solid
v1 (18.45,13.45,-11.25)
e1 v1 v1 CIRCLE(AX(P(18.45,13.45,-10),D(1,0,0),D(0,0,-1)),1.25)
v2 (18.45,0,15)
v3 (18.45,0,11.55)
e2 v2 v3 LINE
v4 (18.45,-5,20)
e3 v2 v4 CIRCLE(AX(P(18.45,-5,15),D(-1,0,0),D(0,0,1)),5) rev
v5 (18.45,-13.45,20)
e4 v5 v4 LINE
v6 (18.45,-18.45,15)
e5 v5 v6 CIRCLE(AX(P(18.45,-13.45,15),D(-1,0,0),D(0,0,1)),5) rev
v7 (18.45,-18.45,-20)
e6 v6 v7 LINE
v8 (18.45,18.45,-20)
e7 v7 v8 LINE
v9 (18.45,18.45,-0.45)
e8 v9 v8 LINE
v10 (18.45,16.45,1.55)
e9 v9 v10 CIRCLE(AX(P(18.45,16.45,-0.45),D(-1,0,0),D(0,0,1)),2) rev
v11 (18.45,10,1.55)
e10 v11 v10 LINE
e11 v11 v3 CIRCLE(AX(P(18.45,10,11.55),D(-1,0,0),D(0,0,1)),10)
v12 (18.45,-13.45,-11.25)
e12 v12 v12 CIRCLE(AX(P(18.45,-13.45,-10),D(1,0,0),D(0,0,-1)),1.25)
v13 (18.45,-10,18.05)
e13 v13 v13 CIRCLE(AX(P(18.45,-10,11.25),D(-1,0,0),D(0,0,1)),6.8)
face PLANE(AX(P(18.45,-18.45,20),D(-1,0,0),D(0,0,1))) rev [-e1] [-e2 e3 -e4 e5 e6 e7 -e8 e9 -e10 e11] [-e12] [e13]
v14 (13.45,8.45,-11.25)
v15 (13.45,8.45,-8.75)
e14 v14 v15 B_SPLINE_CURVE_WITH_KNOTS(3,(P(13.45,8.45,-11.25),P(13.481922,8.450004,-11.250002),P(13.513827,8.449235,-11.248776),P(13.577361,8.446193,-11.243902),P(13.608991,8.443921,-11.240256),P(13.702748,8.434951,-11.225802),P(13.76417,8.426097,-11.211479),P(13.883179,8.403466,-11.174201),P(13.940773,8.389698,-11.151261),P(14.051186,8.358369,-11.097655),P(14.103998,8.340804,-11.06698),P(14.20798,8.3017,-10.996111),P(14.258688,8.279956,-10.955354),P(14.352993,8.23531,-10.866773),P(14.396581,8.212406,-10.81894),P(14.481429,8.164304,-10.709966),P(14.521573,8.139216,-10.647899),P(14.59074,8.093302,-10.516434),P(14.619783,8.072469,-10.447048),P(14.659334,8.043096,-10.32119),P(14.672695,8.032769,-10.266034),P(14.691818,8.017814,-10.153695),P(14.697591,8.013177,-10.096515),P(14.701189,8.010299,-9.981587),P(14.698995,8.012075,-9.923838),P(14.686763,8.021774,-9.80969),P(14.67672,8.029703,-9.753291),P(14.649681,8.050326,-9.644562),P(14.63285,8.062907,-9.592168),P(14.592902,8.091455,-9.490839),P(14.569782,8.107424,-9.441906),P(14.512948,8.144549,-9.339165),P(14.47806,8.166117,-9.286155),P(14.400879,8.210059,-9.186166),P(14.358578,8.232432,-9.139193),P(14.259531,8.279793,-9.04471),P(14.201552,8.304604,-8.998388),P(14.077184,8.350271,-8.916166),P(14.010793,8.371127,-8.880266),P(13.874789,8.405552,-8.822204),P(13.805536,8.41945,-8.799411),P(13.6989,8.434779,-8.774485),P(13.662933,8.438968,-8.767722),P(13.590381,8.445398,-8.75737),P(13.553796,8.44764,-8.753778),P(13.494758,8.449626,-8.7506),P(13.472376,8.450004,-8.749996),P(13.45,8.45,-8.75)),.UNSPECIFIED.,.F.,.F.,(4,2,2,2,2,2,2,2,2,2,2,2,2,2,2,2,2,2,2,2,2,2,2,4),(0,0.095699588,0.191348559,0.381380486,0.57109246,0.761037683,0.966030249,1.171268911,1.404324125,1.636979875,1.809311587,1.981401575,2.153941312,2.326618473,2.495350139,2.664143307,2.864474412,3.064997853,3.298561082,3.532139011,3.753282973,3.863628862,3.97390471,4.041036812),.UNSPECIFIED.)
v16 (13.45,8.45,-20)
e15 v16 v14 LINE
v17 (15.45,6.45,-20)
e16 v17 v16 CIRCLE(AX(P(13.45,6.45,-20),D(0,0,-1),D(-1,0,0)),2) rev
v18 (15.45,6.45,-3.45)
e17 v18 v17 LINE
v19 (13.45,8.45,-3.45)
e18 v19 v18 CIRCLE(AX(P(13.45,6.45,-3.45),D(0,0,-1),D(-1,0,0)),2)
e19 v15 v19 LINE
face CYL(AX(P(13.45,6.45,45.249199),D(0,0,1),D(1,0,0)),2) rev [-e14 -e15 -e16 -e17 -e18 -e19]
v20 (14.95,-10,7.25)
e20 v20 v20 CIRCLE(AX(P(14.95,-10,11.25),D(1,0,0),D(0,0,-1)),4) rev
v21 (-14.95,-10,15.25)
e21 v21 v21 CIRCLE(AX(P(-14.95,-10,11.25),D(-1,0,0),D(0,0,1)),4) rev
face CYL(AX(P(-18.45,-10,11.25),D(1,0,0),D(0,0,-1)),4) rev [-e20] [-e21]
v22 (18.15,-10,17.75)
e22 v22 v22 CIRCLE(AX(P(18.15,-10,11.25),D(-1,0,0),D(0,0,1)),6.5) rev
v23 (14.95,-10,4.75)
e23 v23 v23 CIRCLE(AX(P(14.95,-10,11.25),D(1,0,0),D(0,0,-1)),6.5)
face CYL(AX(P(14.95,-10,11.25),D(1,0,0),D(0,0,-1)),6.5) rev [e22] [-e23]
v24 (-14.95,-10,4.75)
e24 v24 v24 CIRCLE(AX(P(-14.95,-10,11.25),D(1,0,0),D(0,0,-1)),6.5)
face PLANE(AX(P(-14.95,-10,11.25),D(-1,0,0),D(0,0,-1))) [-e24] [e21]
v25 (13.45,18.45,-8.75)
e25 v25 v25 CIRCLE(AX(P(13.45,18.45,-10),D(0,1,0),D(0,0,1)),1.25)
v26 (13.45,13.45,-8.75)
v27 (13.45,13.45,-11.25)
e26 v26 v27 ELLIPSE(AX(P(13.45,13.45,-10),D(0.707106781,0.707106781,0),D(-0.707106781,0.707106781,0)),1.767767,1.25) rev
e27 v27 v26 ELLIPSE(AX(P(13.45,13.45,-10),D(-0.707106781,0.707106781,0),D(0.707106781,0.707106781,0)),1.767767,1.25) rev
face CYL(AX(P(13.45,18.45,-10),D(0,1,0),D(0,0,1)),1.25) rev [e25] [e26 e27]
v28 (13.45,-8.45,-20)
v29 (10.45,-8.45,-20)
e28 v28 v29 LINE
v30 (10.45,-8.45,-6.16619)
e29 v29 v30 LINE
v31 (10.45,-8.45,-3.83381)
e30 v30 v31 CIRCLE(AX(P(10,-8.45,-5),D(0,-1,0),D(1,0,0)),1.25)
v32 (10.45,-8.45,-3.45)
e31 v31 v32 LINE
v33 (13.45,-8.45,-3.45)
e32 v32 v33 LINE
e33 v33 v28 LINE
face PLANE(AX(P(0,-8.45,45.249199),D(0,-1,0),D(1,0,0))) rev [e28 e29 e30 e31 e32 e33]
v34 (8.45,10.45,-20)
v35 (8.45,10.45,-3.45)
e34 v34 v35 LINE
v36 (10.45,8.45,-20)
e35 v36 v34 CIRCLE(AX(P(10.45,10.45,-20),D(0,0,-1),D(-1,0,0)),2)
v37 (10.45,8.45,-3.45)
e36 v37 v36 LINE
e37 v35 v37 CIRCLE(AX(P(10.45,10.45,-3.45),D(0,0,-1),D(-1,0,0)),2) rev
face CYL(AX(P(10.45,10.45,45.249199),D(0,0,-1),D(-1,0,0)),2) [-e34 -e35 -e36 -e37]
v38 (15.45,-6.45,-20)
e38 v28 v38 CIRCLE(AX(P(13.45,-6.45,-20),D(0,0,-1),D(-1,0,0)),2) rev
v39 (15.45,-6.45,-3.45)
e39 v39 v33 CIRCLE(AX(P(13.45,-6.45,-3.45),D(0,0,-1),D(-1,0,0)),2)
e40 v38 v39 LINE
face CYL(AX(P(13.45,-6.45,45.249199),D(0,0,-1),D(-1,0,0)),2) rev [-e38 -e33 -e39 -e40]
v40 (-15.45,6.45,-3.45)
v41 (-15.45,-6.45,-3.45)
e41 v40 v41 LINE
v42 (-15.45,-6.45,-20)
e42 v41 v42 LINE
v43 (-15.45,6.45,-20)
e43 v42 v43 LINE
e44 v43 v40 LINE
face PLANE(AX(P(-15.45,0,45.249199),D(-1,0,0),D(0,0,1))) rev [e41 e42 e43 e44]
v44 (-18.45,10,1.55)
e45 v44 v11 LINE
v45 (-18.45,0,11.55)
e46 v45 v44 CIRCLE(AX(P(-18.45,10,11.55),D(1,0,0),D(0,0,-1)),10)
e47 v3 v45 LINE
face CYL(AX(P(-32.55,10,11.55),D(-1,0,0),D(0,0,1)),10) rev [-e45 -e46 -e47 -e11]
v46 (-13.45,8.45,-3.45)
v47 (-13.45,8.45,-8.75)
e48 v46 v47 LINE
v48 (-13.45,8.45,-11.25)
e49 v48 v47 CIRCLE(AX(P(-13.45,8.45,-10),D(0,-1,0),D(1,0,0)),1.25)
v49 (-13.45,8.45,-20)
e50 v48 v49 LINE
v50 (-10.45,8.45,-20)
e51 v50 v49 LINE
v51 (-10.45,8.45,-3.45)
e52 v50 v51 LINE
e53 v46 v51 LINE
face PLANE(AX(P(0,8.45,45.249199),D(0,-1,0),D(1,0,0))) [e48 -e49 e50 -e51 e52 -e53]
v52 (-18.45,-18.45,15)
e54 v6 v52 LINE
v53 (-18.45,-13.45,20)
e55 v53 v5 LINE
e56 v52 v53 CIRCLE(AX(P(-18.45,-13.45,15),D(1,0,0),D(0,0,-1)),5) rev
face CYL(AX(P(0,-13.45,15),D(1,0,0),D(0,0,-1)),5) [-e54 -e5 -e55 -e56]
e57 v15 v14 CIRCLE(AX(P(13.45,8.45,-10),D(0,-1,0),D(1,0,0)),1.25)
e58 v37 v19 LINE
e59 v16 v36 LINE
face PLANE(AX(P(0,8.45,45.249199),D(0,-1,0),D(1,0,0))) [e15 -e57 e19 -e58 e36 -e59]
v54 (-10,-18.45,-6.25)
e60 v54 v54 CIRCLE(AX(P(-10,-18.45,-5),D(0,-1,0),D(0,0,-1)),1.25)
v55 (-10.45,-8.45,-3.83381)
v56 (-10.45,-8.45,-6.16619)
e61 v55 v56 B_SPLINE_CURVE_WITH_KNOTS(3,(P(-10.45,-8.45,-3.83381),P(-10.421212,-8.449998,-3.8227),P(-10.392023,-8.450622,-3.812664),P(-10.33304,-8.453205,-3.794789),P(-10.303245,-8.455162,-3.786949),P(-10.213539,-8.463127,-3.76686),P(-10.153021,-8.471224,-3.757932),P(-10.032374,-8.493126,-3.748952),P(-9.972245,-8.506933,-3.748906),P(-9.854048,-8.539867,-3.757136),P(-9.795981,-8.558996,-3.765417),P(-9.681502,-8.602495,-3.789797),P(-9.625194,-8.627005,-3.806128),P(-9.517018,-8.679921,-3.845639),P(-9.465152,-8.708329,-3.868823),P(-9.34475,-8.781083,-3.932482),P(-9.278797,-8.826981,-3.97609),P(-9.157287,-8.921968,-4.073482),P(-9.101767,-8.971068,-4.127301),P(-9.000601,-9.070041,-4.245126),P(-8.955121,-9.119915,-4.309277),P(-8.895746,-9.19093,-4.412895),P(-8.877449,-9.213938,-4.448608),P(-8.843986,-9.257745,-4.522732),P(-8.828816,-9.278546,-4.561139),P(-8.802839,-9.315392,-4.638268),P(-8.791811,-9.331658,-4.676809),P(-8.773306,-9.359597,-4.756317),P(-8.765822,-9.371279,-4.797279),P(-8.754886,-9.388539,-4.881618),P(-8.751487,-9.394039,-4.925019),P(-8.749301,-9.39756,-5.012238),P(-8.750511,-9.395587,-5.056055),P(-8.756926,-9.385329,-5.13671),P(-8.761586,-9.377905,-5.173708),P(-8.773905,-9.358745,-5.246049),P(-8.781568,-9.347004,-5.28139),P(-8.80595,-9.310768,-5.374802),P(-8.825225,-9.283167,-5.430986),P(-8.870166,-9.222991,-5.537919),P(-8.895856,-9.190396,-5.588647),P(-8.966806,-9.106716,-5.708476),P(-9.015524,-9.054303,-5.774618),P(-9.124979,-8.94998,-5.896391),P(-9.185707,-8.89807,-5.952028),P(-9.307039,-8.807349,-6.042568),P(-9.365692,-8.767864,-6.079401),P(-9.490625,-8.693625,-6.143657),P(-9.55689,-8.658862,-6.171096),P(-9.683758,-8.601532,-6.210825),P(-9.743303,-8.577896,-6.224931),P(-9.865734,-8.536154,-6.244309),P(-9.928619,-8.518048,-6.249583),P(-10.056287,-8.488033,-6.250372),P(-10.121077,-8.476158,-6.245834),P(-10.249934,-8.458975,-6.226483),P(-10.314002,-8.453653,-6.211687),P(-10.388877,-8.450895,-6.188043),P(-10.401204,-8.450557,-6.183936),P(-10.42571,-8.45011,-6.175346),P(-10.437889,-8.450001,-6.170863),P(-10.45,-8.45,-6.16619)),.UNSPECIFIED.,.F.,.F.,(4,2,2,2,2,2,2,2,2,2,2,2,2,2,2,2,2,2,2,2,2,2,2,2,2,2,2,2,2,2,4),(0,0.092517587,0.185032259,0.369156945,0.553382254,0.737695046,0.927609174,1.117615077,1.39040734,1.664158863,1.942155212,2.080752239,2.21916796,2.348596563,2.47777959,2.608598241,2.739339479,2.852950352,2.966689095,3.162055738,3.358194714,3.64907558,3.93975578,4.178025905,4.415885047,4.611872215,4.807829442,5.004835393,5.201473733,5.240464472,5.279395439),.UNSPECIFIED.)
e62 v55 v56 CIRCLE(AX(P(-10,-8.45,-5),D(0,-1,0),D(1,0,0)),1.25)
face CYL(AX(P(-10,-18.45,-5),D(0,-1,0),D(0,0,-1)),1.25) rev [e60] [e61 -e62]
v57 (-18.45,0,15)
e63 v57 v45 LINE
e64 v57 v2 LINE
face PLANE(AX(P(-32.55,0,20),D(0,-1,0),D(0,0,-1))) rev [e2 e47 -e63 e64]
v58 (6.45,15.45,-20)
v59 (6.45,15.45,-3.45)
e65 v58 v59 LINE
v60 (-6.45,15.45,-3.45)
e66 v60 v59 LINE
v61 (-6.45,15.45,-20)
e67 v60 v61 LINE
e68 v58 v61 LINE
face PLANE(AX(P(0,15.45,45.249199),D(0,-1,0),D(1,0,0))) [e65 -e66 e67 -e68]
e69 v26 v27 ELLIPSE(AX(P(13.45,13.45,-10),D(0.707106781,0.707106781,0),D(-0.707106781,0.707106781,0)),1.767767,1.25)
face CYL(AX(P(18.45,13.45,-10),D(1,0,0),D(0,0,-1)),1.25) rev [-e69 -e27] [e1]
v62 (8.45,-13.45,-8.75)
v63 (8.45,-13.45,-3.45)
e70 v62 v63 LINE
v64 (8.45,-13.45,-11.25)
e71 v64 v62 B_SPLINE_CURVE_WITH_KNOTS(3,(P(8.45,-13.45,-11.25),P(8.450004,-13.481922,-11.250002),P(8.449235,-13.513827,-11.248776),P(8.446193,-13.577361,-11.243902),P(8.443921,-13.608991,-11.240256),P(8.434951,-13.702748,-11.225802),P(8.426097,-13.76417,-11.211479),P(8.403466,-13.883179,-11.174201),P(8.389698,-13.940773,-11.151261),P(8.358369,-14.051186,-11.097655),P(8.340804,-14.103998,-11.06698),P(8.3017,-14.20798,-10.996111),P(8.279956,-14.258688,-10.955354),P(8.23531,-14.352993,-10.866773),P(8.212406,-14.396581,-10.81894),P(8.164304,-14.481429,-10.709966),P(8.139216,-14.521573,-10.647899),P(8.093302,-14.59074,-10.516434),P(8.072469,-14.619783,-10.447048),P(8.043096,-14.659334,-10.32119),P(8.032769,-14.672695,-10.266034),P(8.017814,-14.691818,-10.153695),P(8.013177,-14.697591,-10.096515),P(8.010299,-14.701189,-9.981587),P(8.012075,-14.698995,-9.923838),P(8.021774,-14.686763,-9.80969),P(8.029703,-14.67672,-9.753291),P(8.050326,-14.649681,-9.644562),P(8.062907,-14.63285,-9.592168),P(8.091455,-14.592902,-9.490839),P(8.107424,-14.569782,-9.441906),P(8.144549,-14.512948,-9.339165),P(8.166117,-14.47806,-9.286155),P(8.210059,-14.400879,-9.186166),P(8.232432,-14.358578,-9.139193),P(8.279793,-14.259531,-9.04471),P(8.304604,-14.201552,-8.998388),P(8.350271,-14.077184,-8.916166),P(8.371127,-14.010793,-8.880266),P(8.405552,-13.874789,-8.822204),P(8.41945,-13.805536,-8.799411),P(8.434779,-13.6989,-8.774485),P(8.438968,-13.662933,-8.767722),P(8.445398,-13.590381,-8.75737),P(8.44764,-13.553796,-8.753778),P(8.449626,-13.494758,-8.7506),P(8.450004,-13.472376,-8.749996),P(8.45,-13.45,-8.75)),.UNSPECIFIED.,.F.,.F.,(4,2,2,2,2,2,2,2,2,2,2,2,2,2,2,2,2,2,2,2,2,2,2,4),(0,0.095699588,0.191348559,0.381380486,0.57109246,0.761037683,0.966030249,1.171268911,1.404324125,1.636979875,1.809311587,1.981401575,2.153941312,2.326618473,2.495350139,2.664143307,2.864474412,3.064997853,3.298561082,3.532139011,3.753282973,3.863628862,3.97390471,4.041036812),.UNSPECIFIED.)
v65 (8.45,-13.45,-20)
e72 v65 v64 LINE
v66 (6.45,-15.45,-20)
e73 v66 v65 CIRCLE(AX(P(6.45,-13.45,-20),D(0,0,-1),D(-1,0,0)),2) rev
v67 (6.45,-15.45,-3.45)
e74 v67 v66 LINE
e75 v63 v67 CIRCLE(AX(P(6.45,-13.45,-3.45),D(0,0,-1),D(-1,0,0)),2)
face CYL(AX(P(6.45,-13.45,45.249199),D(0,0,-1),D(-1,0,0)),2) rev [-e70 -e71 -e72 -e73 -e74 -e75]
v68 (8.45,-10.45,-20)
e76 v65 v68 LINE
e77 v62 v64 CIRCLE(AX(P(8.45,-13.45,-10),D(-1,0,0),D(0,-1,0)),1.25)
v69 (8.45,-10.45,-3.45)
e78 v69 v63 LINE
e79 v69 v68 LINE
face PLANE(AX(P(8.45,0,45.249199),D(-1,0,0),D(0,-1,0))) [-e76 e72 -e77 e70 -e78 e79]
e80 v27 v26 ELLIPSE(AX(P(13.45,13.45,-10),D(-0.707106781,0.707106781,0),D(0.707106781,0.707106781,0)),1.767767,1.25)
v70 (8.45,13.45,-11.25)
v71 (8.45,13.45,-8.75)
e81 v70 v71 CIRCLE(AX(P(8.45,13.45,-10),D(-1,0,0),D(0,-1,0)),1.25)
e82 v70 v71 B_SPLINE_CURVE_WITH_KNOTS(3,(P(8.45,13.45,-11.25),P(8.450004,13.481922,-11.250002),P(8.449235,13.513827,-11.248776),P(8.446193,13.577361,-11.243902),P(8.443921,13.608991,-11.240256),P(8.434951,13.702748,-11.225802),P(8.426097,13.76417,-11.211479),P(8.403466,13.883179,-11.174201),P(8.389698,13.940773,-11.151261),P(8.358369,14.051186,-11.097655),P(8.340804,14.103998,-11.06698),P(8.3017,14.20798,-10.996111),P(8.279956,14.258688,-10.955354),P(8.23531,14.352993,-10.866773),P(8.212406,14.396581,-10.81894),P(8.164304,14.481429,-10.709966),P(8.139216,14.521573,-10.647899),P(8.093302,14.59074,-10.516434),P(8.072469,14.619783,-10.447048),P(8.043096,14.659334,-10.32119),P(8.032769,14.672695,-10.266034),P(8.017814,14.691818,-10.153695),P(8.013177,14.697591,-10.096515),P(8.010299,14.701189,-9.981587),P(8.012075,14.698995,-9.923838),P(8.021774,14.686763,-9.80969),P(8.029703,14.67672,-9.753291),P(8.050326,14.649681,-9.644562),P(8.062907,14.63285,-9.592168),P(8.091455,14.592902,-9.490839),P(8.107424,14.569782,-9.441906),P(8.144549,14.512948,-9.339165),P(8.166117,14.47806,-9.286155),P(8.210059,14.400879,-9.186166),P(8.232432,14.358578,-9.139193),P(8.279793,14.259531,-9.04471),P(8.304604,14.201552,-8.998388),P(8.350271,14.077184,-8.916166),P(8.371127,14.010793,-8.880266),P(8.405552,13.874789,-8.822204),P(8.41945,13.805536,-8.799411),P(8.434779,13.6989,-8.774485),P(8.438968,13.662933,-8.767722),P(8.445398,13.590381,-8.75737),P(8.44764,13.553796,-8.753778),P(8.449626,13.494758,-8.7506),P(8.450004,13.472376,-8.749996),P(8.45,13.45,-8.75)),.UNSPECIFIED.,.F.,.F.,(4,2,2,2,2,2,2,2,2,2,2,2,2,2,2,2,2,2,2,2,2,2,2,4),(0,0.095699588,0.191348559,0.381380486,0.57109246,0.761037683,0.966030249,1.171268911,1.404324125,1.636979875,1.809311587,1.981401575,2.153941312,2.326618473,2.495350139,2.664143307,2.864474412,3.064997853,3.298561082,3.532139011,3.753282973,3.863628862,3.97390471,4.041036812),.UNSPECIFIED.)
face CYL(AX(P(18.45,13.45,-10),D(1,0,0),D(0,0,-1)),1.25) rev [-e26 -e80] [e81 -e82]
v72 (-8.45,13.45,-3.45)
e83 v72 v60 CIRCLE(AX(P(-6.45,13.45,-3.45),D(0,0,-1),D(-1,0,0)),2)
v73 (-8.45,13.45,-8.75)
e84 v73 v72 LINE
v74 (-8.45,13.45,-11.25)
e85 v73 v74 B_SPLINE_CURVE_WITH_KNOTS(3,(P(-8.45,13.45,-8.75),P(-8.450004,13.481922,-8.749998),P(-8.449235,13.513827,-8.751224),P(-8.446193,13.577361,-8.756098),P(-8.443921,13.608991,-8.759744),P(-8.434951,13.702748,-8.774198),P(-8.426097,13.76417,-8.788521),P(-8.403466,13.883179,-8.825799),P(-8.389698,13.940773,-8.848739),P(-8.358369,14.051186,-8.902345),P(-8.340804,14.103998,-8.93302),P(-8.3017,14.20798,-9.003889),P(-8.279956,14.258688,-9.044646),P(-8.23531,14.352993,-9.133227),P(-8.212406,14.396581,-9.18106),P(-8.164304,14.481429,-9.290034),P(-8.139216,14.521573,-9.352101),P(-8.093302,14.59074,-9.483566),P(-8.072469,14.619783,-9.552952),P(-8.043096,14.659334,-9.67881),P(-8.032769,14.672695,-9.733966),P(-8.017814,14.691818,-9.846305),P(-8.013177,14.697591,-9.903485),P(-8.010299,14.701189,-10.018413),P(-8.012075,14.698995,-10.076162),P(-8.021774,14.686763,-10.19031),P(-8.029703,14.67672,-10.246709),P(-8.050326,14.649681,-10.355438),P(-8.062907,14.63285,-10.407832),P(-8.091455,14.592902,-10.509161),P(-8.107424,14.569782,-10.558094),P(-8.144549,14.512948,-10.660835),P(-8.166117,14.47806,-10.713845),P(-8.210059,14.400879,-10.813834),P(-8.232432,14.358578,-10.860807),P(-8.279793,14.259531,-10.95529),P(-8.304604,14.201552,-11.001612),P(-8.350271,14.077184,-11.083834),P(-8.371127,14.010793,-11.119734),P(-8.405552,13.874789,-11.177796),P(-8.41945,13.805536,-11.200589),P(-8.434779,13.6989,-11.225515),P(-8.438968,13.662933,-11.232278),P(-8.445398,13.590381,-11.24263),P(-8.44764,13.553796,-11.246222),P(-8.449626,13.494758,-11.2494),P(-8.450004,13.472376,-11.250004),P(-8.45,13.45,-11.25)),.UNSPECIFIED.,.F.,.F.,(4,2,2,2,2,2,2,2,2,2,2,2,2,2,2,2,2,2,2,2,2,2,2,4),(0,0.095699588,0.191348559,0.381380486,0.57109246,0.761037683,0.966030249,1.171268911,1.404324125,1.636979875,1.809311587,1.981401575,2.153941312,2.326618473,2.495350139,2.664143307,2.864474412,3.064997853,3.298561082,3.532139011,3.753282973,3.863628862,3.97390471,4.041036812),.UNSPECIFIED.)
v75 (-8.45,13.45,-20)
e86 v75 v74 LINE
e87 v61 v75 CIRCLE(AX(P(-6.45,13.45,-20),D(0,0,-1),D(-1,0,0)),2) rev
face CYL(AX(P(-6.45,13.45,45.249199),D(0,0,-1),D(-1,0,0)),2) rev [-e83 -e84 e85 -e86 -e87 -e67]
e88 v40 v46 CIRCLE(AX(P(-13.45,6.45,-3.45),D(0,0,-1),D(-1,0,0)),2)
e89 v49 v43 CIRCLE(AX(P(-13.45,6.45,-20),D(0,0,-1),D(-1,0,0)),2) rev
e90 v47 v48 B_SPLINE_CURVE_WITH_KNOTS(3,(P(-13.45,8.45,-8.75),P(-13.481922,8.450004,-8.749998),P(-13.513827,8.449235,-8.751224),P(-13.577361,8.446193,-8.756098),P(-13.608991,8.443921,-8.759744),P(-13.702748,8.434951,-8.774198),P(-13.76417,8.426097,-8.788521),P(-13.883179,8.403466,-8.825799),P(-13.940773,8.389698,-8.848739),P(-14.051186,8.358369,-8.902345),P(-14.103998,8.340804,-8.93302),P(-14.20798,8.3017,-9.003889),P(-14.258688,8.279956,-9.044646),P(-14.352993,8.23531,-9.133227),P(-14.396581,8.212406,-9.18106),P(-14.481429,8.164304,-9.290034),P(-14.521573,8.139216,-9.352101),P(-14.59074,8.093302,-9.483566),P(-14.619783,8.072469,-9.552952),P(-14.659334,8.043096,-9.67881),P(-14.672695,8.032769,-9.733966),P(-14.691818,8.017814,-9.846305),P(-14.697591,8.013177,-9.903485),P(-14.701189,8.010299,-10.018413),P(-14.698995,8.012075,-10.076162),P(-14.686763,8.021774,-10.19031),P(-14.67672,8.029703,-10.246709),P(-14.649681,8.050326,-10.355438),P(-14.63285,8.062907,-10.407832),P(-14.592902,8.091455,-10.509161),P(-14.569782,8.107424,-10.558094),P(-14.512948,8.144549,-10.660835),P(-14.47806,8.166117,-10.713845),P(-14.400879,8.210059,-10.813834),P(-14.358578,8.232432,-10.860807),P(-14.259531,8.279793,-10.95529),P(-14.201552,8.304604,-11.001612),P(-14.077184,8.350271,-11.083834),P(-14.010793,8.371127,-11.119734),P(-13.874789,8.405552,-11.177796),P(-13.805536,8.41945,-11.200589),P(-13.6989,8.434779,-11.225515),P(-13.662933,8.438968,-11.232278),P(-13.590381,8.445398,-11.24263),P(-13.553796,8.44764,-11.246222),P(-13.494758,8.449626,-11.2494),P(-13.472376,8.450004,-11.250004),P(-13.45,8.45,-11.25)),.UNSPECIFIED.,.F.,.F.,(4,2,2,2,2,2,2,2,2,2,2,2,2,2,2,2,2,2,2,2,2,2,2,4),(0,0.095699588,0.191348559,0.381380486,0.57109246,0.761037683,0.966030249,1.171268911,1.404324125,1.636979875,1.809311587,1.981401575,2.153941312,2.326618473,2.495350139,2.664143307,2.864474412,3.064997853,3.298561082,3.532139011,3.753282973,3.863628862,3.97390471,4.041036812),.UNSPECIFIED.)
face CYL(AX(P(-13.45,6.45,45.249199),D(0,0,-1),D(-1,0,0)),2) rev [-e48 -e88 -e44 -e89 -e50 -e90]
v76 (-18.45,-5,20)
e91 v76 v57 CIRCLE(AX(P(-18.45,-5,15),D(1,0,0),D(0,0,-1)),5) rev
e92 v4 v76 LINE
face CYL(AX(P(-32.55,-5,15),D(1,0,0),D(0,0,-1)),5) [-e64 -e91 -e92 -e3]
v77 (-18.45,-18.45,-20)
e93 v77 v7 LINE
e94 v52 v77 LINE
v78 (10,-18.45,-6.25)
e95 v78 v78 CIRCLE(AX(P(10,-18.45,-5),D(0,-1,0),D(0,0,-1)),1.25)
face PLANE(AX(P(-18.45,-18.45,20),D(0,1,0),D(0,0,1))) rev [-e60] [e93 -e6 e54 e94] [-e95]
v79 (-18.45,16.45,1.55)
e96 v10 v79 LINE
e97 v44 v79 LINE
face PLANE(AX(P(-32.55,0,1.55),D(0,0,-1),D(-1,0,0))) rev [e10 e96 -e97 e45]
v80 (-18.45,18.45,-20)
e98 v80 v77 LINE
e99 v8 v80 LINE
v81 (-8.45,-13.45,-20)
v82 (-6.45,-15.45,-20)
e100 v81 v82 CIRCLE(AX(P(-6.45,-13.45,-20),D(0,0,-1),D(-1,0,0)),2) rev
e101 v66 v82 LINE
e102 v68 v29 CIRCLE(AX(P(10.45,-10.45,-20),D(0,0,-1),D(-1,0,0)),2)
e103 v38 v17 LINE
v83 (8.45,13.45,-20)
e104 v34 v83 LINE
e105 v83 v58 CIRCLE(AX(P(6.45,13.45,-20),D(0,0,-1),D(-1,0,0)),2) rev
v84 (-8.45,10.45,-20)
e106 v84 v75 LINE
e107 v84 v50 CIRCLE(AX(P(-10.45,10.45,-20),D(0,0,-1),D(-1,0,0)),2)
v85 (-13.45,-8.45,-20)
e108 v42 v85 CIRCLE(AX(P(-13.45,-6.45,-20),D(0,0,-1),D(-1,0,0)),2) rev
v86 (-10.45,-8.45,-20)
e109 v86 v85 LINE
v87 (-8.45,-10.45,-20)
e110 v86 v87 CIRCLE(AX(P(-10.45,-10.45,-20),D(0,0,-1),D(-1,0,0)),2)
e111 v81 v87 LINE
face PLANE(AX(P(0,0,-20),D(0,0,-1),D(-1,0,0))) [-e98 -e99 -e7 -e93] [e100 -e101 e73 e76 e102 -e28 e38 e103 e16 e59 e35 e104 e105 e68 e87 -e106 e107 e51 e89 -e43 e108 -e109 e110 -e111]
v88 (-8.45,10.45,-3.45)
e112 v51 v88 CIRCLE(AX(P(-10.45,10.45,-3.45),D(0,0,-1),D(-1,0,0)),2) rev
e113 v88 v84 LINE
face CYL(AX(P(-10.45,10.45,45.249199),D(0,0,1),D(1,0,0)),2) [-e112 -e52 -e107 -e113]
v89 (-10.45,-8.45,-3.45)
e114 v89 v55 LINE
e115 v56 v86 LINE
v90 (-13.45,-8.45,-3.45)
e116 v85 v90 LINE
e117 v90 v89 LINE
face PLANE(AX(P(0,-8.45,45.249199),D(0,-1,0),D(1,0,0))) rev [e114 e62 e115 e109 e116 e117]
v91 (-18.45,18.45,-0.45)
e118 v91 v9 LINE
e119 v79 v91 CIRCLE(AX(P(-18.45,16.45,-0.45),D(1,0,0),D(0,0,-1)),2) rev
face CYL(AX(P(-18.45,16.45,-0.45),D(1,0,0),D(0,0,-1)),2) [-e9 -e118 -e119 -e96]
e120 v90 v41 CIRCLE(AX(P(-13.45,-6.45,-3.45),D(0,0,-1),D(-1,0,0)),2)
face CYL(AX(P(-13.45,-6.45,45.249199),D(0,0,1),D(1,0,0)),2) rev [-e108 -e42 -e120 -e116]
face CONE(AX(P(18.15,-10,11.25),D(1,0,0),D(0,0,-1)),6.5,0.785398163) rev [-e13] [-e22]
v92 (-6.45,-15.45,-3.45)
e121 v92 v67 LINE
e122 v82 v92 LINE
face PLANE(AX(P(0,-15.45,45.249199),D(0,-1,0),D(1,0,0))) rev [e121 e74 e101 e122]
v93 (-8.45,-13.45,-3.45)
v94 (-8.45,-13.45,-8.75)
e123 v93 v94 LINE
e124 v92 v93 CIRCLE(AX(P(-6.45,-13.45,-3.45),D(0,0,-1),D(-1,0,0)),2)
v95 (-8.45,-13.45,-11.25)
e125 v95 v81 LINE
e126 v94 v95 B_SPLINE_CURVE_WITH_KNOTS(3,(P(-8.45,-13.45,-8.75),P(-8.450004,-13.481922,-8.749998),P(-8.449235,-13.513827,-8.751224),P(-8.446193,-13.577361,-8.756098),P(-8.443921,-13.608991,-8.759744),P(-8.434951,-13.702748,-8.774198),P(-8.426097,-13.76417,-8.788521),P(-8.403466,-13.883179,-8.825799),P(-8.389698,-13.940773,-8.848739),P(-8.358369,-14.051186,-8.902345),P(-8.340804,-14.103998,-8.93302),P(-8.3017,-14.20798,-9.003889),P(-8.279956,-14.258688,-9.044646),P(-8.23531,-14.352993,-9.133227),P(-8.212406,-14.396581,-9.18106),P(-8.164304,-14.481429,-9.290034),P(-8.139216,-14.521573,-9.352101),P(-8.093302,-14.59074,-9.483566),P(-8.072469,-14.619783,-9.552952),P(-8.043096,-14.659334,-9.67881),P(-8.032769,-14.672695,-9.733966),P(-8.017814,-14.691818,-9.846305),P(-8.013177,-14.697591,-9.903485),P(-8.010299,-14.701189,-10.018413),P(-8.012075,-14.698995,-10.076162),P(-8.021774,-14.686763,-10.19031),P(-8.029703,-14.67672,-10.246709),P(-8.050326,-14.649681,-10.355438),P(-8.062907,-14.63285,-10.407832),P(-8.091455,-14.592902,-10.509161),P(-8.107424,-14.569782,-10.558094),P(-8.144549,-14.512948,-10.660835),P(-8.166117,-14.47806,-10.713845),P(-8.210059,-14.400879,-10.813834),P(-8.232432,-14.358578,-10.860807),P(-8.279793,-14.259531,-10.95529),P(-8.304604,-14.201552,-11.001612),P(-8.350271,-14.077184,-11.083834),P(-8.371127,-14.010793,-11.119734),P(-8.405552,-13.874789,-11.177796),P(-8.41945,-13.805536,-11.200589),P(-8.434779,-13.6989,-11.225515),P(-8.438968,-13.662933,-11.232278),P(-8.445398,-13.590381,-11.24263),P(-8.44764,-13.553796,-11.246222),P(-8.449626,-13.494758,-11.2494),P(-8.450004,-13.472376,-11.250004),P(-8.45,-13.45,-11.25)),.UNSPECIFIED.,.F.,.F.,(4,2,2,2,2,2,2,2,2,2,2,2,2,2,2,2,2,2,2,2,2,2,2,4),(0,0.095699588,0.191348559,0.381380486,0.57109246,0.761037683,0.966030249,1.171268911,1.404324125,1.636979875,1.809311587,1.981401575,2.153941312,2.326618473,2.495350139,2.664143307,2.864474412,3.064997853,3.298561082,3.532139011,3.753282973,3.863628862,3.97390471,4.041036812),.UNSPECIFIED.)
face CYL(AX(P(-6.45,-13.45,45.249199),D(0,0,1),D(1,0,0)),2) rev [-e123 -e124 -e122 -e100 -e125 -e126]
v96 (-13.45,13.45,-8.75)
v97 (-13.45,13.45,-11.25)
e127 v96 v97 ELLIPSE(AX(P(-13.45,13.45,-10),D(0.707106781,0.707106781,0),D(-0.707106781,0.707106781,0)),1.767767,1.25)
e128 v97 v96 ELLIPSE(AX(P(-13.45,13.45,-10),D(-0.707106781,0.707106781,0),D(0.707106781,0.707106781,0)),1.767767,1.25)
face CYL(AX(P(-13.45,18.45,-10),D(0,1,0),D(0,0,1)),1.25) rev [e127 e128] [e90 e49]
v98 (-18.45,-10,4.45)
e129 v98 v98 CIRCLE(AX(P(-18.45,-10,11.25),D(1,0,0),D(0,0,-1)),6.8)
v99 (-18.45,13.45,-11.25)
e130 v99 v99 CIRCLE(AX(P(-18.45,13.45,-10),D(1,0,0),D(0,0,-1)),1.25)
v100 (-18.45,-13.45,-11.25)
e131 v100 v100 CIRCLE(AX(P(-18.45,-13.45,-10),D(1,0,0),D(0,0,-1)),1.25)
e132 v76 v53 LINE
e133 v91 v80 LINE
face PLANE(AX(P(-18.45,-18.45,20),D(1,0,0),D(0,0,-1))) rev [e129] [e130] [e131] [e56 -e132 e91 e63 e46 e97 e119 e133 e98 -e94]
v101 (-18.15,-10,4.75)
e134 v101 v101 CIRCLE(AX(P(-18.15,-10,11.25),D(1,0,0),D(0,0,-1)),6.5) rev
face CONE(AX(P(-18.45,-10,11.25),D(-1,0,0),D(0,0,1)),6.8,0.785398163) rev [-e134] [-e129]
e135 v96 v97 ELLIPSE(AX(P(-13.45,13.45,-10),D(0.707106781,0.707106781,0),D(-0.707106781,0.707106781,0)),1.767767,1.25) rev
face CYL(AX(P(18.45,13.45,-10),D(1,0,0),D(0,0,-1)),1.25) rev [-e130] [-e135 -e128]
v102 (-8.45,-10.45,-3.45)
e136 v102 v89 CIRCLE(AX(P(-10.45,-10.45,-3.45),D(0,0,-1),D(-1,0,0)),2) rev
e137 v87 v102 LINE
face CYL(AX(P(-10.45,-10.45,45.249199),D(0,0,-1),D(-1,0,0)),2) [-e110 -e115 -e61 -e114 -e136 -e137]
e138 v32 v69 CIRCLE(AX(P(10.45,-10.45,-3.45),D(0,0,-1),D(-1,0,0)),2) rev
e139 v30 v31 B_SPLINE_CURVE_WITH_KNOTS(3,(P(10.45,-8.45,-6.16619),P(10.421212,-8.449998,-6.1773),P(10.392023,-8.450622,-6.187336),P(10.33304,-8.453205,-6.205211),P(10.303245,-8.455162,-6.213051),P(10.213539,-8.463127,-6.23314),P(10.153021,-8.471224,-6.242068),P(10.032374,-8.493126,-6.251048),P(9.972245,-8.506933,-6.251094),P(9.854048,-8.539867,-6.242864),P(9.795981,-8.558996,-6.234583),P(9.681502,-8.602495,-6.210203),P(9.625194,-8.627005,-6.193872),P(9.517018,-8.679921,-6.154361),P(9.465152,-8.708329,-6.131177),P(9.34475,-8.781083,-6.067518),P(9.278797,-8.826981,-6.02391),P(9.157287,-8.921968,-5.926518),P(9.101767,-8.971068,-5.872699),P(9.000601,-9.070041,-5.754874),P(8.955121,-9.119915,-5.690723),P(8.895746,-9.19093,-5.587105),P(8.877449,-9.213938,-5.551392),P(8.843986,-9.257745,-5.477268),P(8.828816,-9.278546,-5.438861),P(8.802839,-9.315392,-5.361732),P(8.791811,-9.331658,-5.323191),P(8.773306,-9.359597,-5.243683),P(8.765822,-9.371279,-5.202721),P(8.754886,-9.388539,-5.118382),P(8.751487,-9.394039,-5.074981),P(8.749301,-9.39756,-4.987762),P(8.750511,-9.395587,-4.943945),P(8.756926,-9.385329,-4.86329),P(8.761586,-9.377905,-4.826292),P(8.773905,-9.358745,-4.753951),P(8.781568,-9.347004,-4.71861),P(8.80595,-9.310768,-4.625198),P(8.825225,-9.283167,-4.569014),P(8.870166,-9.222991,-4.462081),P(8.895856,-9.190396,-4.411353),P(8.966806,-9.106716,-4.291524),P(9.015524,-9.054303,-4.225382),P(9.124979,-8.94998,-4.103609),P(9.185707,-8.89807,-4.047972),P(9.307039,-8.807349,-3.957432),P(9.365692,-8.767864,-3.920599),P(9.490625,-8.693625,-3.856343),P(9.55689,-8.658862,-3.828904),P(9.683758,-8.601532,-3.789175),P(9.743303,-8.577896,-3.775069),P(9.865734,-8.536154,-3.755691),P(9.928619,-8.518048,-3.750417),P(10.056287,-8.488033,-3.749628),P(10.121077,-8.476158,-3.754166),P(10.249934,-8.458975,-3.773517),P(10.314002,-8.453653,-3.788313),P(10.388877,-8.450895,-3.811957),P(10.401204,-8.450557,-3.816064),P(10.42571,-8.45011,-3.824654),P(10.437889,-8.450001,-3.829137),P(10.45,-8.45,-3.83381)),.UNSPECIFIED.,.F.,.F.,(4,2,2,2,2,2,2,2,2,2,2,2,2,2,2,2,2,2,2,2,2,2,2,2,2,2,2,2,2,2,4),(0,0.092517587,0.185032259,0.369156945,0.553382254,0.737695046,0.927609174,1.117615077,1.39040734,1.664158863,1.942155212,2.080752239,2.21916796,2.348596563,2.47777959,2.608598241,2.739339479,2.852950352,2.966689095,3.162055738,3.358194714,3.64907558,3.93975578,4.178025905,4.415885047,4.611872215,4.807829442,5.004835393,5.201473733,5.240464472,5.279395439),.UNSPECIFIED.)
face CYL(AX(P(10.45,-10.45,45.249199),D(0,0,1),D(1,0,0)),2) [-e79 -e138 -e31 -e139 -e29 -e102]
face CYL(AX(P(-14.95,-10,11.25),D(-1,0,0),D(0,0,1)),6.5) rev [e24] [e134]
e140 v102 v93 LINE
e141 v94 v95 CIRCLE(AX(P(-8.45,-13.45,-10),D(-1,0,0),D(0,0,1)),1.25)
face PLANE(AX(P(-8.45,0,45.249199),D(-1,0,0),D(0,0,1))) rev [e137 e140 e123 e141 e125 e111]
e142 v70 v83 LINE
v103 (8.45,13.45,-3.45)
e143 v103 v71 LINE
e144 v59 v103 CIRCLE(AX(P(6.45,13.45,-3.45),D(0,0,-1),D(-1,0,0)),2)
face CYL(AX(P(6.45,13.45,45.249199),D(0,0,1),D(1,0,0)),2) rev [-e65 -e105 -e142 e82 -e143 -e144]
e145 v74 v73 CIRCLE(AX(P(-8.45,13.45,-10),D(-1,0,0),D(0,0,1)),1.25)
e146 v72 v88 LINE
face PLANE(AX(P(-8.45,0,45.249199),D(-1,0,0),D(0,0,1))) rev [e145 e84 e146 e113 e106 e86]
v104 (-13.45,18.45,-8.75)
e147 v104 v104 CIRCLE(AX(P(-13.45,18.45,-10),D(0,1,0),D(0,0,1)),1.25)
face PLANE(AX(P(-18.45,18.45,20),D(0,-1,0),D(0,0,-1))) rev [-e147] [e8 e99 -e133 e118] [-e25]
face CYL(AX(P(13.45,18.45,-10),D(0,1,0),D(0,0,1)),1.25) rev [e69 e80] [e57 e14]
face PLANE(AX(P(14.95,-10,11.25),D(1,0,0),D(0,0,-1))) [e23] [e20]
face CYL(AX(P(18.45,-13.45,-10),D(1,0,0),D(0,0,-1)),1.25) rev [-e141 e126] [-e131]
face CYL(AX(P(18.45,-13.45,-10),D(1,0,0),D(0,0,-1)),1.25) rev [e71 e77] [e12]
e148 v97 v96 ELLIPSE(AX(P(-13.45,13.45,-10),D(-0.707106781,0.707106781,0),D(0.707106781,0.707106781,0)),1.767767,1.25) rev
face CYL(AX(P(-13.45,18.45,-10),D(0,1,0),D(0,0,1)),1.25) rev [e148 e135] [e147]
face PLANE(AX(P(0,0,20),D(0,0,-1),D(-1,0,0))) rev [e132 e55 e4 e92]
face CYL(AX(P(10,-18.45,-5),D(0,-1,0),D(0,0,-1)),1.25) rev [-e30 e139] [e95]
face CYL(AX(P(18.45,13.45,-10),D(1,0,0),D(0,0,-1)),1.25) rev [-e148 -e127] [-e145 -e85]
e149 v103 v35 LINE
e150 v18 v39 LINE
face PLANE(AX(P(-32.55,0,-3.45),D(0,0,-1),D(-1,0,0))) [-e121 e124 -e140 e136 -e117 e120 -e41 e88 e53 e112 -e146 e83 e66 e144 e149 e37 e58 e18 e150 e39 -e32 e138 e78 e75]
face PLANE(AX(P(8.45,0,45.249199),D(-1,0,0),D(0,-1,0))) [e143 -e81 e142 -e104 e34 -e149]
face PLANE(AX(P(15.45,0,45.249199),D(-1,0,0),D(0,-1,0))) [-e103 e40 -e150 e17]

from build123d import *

# Parameters (mm, degrees)
SKETCH_1_W             = 36.9
SKETCH_1_H             = 36.9
EXTRUDE_1_DEPTH        = 20
SKETCH_2_R             = 4
CUT_EXTRUDE_1_DEPTH    = 36.9
SKETCH_3_R             = 6.5
CUT_EXTRUDE_2_DEPTH    = 3.5
CUT_EXTRUDE_3_DEPTH    = 51
FILLET_1_R             = 10
FILLET_2_R             = 5
SKETCH_5_W             = 16.9
SKETCH_5_H             = 16.9
SKETCH_5_W_2           = 7
SKETCH_5_H_2           = 7
CUT_EXTRUDE_4_DEPTH    = 16.55
HOLE_WIZARD_M3_1_D     = 2.5
HOLE_WIZARD_M3_1_DEPTH = 10
HOLE_WIZARD_M3_2_D     = 2.5
HOLE_WIZARD_M3_3_D     = 2.5
HOLE_WIZARD_M3_3_DEPTH = 10
FILLET_3_R             = 2
FILLET_7_R             = 2
CHAMFER_1_SIZE         = 0.3


with BuildPart() as part:
    # 草图1 → 凸台-拉伸1 (new, symmetric)
    with BuildSketch(Plane.XY):
        Rectangle(SKETCH_1_W, SKETCH_1_H)
    extrude(amount=EXTRUDE_1_DEPTH, both=True)

    # 草图2 → 切除-拉伸1 (cut)
    with BuildSketch(Plane(origin=(18.45, 0, 0), x_dir=(0, 0, -1), z_dir=(1, 0, 0))):
        with Locations((-11.25, -10)):
            Circle(SKETCH_2_R)
        Polygon((-1.5, 18.5), (-20, 0), (-20, 18.5), align=None)
    extrude(amount=-CUT_EXTRUDE_1_DEPTH, mode=Mode.SUBTRACT)

    # 草图3 → 切除-拉伸2 (cut)
    with BuildSketch(Plane(origin=(18.45, 0, 0), x_dir=(0, 0, -1), z_dir=(1, 0, 0))):
        with Locations((-11.25, -10)):
            Circle(SKETCH_3_R)
    cut_extrude_2 = extrude(amount=-CUT_EXTRUDE_2_DEPTH, mode=Mode.SUBTRACT)

    # 镜向1: 切除-拉伸2 across plane
    add(cut_extrude_2.mirror(Plane(origin=(0, 0, 0), x_dir=(0, 0, 1), z_dir=(1, 0, 0))), mode=Mode.SUBTRACT)

    # 草图4 → 切除-拉伸3 (cut)
    with BuildSketch(Plane(origin=(18.45, 0, 0), x_dir=(0, 0, -1), z_dir=(1, 0, 0))):
        Polygon((-20, 0), (-1.55, 0), (-1.55, 18.45), align=None)
    extrude(amount=-CUT_EXTRUDE_3_DEPTH, mode=Mode.SUBTRACT)

    # 圆角1
    fillet_1_edges = [part.edges().sort_by_distance(p)[0] for p in [
        (0, 0, 1.55),
    ]]
    fillet(fillet_1_edges, radius=FILLET_1_R)

    # 圆角2
    fillet_2_edges = [part.edges().sort_by_distance(p)[0] for p in [
        (0, -18.45, 20),
        (0, 0, 20),
    ]]
    fillet(fillet_2_edges, radius=FILLET_2_R)

    # 草图5 → 切除-拉伸4 (cut)
    with BuildSketch(Plane(origin=(0, 0, -20), x_dir=(-1, 0, 0), z_dir=(0, 0, -1))):
        Rectangle(SKETCH_5_W, SKETCH_5_H)
        with Locations((-11.95, 0)):
            Rectangle(SKETCH_5_W_2, SKETCH_5_H)
        with Locations((0, 11.95)):
            Rectangle(SKETCH_5_W, SKETCH_5_H_2)
        with Locations((11.95, 0)):
            Rectangle(SKETCH_5_W_2, SKETCH_5_H)
        with Locations((0, -11.95)):
            Rectangle(SKETCH_5_W, SKETCH_5_H_2)
    extrude(amount=-CUT_EXTRUDE_4_DEPTH, mode=Mode.SUBTRACT)

    # M3 螺纹孔1
    with Locations(Plane(origin=(0, 18.45, 0), x_dir=(1, 0, 0), z_dir=(0, 1, 0))):
        with Locations((-13.45, 10), (13.45, 10)):
            Hole(HOLE_WIZARD_M3_1_D / 2, depth=HOLE_WIZARD_M3_1_DEPTH)

    # M3 螺纹孔2 (through all)
    with Locations(Plane(origin=(18.45, 0, 0), x_dir=(0, 0, -1), z_dir=(1, 0, 0))):
        with Locations((10, -13.45)):
            hole_wizard_m3_2 = Hole(HOLE_WIZARD_M3_2_D / 2)

    # 镜向2: M3 螺纹孔2 across plane
    add(hole_wizard_m3_2.mirror(Plane(origin=(0, 0, 0), x_dir=(0, 0, 1), z_dir=(1, 0, 0))), mode=Mode.SUBTRACT)

    # M3 螺纹孔3
    with Locations(Plane(origin=(0, -18.45, 0), x_dir=(-1, 0, 0), z_dir=(0, -1, 0))):
        with Locations((10, 5), (-10, 5)):
            Hole(HOLE_WIZARD_M3_3_D / 2, depth=HOLE_WIZARD_M3_3_DEPTH)

    # 圆角3
    # the kernel refuses this fillet: 2 mm, written as the material it adds along each edge
    with BuildSketch(Plane(origin=(-15.45, 8.45, -20), x_dir=(1, 0, 0), z_dir=(0, 0, 1))) as fillet_3_piece_1_section:
        with BuildLine():
            CenterArc((FILLET_3_R, -FILLET_3_R), FILLET_3_R, 90, 90)
            Line((0, -FILLET_3_R), (0, 0))
            Line((0, 0), (FILLET_3_R, 0))
        make_face()
    fillet_3_piece_1 = extrude(amount=21.55, mode=Mode.PRIVATE)
    fillet_3_piece_1 = fillet_3_piece_1 - Plane(origin=(-13.45, 7.989094357, -10), x_dir=(-1, 0, 0), z_dir=(0, -1, 0)) * Cylinder(1.25, 52, mode=Mode.PRIVATE)
    add(fillet_3_piece_1)
    with BuildSketch(Plane(origin=(-15.45, -8.45, -20), x_dir=(0, 1, 0), z_dir=(0, 0, 1)), Plane(origin=(15.45, -8.45, -20), x_dir=(-1, 0, 0), z_dir=(0, 0, 1)), Plane(origin=(8.45, 15.45, -20), x_dir=(0, -1, 0), z_dir=(0, 0, 1)), Plane(origin=(-8.45, 15.45, -20), x_dir=(1, 0, 0), z_dir=(0, 0, 1))) as fillet_3_piece_2:
        with BuildLine():
            CenterArc((FILLET_3_R, -FILLET_3_R), FILLET_3_R, 90, 90)
            Line((0, -FILLET_3_R), (0, 0))
            Line((0, 0), (FILLET_3_R, 0))
        make_face()
    extrude(amount=21.55)
    with BuildSketch(Plane(origin=(-8.45, -15.45, -20), x_dir=(0, 1, 0), z_dir=(0, 0, 1))) as fillet_3_piece_3_section:
        with BuildLine():
            CenterArc((FILLET_3_R, -FILLET_3_R), FILLET_3_R, 90, 90)
            Line((0, -FILLET_3_R), (0, 0))
            Line((0, 0), (FILLET_3_R, 0))
        make_face()
    fillet_3_piece_3 = extrude(amount=21.55, mode=Mode.PRIVATE)
    fillet_3_piece_3 = fillet_3_piece_3 - Plane(origin=(-7.989094431, -13.45, -10), x_dir=(0, 0, 1), z_dir=(-1, 0, 0)) * Cylinder(1.25, 52, mode=Mode.PRIVATE)
    add(fillet_3_piece_3)
    with BuildSketch(Plane(origin=(8.45, -15.45, -20), x_dir=(-1, 0, 0), z_dir=(0, 0, 1))) as fillet_3_piece_4_section:
        with BuildLine():
            CenterArc((FILLET_3_R, -FILLET_3_R), FILLET_3_R, 90, 90)
            Line((0, -FILLET_3_R), (0, 0))
            Line((0, 0), (FILLET_3_R, 0))
        make_face()
    fillet_3_piece_4 = extrude(amount=21.55, mode=Mode.PRIVATE)
    fillet_3_piece_4 = fillet_3_piece_4 - Plane(origin=(7.989094875, -13.45, -10), x_dir=(0, 0, 1), z_dir=(-1, 0, 0)) * Cylinder(1.25, 52, mode=Mode.PRIVATE)
    add(fillet_3_piece_4)
    with BuildSketch(Plane(origin=(15.45, 8.45, -20), x_dir=(-1, 0, 0), z_dir=(0, 0, 1))) as fillet_3_piece_5_section:
        with BuildLine():
            CenterArc((FILLET_3_R, FILLET_3_R), FILLET_3_R, 180, 90)
            Line((0, FILLET_3_R), (0, 0))
            Line((0, 0), (FILLET_3_R, 0))
        make_face()
    fillet_3_piece_5 = extrude(amount=21.55, mode=Mode.PRIVATE)
    fillet_3_piece_5 = fillet_3_piece_5 - Plane(origin=(13.45, 7.989094431, -10), x_dir=(-1, 0, 0), z_dir=(0, -1, 0)) * Cylinder(1.25, 52, mode=Mode.PRIVATE)
    add(fillet_3_piece_5)
    # the kernel refuses this fillet: 2 mm, written as the material it takes off along each edge
    with BuildSketch(Plane(origin=(-8.45, 8.45, -25), x_dir=(-1, 0, 0), z_dir=(0, 0, 1)), Plane(origin=(8.45, -8.45, -25), x_dir=(1, 0, 0), z_dir=(0, 0, 1))) as fillet_3_2_piece_1:
        with BuildLine():
            CenterArc((FILLET_3_R, -FILLET_3_R), FILLET_3_R, 90, 90)
            Line((0, -FILLET_3_R), (0, 0))
            Line((0, 0), (FILLET_3_R, 0))
        make_face()
    extrude(amount=21.55, mode=Mode.SUBTRACT)
    with BuildSketch(Plane(origin=(-8.45, -8.45, -25), x_dir=(-1, 0, 0), z_dir=(0, 0, 1)), Plane(origin=(8.45, 8.45, -25), x_dir=(1, 0, 0), z_dir=(0, 0, 1))) as fillet_3_2_piece_2:
        with BuildLine():
            CenterArc((FILLET_3_R, FILLET_3_R), FILLET_3_R, 180, 90)
            Line((0, FILLET_3_R), (0, 0))
            Line((0, 0), (FILLET_3_R, 0))
        make_face()
    extrude(amount=21.55, mode=Mode.SUBTRACT)

    # 圆角7
    fillet_7_edges = [part.edges().sort_by_distance(p)[0] for p in [
        (0, 18.45, 1.55),
    ]]
    fillet(fillet_7_edges, radius=FILLET_7_R)

    # 镜向3: M3 螺纹孔2 across plane
    add(hole_wizard_m3_2.mirror(Plane.ZX), mode=Mode.SUBTRACT)

    # 倒角1
    chamfer_1_edges = [part.edges().sort_by_distance(p)[0] for p in [
        (18.45, -10, 17.75),
        (-18.45, -10, 17.75),
    ]]
    chamfer(chamfer_1_edges, length=CHAMFER_1_SIZE)


solid = part.part
